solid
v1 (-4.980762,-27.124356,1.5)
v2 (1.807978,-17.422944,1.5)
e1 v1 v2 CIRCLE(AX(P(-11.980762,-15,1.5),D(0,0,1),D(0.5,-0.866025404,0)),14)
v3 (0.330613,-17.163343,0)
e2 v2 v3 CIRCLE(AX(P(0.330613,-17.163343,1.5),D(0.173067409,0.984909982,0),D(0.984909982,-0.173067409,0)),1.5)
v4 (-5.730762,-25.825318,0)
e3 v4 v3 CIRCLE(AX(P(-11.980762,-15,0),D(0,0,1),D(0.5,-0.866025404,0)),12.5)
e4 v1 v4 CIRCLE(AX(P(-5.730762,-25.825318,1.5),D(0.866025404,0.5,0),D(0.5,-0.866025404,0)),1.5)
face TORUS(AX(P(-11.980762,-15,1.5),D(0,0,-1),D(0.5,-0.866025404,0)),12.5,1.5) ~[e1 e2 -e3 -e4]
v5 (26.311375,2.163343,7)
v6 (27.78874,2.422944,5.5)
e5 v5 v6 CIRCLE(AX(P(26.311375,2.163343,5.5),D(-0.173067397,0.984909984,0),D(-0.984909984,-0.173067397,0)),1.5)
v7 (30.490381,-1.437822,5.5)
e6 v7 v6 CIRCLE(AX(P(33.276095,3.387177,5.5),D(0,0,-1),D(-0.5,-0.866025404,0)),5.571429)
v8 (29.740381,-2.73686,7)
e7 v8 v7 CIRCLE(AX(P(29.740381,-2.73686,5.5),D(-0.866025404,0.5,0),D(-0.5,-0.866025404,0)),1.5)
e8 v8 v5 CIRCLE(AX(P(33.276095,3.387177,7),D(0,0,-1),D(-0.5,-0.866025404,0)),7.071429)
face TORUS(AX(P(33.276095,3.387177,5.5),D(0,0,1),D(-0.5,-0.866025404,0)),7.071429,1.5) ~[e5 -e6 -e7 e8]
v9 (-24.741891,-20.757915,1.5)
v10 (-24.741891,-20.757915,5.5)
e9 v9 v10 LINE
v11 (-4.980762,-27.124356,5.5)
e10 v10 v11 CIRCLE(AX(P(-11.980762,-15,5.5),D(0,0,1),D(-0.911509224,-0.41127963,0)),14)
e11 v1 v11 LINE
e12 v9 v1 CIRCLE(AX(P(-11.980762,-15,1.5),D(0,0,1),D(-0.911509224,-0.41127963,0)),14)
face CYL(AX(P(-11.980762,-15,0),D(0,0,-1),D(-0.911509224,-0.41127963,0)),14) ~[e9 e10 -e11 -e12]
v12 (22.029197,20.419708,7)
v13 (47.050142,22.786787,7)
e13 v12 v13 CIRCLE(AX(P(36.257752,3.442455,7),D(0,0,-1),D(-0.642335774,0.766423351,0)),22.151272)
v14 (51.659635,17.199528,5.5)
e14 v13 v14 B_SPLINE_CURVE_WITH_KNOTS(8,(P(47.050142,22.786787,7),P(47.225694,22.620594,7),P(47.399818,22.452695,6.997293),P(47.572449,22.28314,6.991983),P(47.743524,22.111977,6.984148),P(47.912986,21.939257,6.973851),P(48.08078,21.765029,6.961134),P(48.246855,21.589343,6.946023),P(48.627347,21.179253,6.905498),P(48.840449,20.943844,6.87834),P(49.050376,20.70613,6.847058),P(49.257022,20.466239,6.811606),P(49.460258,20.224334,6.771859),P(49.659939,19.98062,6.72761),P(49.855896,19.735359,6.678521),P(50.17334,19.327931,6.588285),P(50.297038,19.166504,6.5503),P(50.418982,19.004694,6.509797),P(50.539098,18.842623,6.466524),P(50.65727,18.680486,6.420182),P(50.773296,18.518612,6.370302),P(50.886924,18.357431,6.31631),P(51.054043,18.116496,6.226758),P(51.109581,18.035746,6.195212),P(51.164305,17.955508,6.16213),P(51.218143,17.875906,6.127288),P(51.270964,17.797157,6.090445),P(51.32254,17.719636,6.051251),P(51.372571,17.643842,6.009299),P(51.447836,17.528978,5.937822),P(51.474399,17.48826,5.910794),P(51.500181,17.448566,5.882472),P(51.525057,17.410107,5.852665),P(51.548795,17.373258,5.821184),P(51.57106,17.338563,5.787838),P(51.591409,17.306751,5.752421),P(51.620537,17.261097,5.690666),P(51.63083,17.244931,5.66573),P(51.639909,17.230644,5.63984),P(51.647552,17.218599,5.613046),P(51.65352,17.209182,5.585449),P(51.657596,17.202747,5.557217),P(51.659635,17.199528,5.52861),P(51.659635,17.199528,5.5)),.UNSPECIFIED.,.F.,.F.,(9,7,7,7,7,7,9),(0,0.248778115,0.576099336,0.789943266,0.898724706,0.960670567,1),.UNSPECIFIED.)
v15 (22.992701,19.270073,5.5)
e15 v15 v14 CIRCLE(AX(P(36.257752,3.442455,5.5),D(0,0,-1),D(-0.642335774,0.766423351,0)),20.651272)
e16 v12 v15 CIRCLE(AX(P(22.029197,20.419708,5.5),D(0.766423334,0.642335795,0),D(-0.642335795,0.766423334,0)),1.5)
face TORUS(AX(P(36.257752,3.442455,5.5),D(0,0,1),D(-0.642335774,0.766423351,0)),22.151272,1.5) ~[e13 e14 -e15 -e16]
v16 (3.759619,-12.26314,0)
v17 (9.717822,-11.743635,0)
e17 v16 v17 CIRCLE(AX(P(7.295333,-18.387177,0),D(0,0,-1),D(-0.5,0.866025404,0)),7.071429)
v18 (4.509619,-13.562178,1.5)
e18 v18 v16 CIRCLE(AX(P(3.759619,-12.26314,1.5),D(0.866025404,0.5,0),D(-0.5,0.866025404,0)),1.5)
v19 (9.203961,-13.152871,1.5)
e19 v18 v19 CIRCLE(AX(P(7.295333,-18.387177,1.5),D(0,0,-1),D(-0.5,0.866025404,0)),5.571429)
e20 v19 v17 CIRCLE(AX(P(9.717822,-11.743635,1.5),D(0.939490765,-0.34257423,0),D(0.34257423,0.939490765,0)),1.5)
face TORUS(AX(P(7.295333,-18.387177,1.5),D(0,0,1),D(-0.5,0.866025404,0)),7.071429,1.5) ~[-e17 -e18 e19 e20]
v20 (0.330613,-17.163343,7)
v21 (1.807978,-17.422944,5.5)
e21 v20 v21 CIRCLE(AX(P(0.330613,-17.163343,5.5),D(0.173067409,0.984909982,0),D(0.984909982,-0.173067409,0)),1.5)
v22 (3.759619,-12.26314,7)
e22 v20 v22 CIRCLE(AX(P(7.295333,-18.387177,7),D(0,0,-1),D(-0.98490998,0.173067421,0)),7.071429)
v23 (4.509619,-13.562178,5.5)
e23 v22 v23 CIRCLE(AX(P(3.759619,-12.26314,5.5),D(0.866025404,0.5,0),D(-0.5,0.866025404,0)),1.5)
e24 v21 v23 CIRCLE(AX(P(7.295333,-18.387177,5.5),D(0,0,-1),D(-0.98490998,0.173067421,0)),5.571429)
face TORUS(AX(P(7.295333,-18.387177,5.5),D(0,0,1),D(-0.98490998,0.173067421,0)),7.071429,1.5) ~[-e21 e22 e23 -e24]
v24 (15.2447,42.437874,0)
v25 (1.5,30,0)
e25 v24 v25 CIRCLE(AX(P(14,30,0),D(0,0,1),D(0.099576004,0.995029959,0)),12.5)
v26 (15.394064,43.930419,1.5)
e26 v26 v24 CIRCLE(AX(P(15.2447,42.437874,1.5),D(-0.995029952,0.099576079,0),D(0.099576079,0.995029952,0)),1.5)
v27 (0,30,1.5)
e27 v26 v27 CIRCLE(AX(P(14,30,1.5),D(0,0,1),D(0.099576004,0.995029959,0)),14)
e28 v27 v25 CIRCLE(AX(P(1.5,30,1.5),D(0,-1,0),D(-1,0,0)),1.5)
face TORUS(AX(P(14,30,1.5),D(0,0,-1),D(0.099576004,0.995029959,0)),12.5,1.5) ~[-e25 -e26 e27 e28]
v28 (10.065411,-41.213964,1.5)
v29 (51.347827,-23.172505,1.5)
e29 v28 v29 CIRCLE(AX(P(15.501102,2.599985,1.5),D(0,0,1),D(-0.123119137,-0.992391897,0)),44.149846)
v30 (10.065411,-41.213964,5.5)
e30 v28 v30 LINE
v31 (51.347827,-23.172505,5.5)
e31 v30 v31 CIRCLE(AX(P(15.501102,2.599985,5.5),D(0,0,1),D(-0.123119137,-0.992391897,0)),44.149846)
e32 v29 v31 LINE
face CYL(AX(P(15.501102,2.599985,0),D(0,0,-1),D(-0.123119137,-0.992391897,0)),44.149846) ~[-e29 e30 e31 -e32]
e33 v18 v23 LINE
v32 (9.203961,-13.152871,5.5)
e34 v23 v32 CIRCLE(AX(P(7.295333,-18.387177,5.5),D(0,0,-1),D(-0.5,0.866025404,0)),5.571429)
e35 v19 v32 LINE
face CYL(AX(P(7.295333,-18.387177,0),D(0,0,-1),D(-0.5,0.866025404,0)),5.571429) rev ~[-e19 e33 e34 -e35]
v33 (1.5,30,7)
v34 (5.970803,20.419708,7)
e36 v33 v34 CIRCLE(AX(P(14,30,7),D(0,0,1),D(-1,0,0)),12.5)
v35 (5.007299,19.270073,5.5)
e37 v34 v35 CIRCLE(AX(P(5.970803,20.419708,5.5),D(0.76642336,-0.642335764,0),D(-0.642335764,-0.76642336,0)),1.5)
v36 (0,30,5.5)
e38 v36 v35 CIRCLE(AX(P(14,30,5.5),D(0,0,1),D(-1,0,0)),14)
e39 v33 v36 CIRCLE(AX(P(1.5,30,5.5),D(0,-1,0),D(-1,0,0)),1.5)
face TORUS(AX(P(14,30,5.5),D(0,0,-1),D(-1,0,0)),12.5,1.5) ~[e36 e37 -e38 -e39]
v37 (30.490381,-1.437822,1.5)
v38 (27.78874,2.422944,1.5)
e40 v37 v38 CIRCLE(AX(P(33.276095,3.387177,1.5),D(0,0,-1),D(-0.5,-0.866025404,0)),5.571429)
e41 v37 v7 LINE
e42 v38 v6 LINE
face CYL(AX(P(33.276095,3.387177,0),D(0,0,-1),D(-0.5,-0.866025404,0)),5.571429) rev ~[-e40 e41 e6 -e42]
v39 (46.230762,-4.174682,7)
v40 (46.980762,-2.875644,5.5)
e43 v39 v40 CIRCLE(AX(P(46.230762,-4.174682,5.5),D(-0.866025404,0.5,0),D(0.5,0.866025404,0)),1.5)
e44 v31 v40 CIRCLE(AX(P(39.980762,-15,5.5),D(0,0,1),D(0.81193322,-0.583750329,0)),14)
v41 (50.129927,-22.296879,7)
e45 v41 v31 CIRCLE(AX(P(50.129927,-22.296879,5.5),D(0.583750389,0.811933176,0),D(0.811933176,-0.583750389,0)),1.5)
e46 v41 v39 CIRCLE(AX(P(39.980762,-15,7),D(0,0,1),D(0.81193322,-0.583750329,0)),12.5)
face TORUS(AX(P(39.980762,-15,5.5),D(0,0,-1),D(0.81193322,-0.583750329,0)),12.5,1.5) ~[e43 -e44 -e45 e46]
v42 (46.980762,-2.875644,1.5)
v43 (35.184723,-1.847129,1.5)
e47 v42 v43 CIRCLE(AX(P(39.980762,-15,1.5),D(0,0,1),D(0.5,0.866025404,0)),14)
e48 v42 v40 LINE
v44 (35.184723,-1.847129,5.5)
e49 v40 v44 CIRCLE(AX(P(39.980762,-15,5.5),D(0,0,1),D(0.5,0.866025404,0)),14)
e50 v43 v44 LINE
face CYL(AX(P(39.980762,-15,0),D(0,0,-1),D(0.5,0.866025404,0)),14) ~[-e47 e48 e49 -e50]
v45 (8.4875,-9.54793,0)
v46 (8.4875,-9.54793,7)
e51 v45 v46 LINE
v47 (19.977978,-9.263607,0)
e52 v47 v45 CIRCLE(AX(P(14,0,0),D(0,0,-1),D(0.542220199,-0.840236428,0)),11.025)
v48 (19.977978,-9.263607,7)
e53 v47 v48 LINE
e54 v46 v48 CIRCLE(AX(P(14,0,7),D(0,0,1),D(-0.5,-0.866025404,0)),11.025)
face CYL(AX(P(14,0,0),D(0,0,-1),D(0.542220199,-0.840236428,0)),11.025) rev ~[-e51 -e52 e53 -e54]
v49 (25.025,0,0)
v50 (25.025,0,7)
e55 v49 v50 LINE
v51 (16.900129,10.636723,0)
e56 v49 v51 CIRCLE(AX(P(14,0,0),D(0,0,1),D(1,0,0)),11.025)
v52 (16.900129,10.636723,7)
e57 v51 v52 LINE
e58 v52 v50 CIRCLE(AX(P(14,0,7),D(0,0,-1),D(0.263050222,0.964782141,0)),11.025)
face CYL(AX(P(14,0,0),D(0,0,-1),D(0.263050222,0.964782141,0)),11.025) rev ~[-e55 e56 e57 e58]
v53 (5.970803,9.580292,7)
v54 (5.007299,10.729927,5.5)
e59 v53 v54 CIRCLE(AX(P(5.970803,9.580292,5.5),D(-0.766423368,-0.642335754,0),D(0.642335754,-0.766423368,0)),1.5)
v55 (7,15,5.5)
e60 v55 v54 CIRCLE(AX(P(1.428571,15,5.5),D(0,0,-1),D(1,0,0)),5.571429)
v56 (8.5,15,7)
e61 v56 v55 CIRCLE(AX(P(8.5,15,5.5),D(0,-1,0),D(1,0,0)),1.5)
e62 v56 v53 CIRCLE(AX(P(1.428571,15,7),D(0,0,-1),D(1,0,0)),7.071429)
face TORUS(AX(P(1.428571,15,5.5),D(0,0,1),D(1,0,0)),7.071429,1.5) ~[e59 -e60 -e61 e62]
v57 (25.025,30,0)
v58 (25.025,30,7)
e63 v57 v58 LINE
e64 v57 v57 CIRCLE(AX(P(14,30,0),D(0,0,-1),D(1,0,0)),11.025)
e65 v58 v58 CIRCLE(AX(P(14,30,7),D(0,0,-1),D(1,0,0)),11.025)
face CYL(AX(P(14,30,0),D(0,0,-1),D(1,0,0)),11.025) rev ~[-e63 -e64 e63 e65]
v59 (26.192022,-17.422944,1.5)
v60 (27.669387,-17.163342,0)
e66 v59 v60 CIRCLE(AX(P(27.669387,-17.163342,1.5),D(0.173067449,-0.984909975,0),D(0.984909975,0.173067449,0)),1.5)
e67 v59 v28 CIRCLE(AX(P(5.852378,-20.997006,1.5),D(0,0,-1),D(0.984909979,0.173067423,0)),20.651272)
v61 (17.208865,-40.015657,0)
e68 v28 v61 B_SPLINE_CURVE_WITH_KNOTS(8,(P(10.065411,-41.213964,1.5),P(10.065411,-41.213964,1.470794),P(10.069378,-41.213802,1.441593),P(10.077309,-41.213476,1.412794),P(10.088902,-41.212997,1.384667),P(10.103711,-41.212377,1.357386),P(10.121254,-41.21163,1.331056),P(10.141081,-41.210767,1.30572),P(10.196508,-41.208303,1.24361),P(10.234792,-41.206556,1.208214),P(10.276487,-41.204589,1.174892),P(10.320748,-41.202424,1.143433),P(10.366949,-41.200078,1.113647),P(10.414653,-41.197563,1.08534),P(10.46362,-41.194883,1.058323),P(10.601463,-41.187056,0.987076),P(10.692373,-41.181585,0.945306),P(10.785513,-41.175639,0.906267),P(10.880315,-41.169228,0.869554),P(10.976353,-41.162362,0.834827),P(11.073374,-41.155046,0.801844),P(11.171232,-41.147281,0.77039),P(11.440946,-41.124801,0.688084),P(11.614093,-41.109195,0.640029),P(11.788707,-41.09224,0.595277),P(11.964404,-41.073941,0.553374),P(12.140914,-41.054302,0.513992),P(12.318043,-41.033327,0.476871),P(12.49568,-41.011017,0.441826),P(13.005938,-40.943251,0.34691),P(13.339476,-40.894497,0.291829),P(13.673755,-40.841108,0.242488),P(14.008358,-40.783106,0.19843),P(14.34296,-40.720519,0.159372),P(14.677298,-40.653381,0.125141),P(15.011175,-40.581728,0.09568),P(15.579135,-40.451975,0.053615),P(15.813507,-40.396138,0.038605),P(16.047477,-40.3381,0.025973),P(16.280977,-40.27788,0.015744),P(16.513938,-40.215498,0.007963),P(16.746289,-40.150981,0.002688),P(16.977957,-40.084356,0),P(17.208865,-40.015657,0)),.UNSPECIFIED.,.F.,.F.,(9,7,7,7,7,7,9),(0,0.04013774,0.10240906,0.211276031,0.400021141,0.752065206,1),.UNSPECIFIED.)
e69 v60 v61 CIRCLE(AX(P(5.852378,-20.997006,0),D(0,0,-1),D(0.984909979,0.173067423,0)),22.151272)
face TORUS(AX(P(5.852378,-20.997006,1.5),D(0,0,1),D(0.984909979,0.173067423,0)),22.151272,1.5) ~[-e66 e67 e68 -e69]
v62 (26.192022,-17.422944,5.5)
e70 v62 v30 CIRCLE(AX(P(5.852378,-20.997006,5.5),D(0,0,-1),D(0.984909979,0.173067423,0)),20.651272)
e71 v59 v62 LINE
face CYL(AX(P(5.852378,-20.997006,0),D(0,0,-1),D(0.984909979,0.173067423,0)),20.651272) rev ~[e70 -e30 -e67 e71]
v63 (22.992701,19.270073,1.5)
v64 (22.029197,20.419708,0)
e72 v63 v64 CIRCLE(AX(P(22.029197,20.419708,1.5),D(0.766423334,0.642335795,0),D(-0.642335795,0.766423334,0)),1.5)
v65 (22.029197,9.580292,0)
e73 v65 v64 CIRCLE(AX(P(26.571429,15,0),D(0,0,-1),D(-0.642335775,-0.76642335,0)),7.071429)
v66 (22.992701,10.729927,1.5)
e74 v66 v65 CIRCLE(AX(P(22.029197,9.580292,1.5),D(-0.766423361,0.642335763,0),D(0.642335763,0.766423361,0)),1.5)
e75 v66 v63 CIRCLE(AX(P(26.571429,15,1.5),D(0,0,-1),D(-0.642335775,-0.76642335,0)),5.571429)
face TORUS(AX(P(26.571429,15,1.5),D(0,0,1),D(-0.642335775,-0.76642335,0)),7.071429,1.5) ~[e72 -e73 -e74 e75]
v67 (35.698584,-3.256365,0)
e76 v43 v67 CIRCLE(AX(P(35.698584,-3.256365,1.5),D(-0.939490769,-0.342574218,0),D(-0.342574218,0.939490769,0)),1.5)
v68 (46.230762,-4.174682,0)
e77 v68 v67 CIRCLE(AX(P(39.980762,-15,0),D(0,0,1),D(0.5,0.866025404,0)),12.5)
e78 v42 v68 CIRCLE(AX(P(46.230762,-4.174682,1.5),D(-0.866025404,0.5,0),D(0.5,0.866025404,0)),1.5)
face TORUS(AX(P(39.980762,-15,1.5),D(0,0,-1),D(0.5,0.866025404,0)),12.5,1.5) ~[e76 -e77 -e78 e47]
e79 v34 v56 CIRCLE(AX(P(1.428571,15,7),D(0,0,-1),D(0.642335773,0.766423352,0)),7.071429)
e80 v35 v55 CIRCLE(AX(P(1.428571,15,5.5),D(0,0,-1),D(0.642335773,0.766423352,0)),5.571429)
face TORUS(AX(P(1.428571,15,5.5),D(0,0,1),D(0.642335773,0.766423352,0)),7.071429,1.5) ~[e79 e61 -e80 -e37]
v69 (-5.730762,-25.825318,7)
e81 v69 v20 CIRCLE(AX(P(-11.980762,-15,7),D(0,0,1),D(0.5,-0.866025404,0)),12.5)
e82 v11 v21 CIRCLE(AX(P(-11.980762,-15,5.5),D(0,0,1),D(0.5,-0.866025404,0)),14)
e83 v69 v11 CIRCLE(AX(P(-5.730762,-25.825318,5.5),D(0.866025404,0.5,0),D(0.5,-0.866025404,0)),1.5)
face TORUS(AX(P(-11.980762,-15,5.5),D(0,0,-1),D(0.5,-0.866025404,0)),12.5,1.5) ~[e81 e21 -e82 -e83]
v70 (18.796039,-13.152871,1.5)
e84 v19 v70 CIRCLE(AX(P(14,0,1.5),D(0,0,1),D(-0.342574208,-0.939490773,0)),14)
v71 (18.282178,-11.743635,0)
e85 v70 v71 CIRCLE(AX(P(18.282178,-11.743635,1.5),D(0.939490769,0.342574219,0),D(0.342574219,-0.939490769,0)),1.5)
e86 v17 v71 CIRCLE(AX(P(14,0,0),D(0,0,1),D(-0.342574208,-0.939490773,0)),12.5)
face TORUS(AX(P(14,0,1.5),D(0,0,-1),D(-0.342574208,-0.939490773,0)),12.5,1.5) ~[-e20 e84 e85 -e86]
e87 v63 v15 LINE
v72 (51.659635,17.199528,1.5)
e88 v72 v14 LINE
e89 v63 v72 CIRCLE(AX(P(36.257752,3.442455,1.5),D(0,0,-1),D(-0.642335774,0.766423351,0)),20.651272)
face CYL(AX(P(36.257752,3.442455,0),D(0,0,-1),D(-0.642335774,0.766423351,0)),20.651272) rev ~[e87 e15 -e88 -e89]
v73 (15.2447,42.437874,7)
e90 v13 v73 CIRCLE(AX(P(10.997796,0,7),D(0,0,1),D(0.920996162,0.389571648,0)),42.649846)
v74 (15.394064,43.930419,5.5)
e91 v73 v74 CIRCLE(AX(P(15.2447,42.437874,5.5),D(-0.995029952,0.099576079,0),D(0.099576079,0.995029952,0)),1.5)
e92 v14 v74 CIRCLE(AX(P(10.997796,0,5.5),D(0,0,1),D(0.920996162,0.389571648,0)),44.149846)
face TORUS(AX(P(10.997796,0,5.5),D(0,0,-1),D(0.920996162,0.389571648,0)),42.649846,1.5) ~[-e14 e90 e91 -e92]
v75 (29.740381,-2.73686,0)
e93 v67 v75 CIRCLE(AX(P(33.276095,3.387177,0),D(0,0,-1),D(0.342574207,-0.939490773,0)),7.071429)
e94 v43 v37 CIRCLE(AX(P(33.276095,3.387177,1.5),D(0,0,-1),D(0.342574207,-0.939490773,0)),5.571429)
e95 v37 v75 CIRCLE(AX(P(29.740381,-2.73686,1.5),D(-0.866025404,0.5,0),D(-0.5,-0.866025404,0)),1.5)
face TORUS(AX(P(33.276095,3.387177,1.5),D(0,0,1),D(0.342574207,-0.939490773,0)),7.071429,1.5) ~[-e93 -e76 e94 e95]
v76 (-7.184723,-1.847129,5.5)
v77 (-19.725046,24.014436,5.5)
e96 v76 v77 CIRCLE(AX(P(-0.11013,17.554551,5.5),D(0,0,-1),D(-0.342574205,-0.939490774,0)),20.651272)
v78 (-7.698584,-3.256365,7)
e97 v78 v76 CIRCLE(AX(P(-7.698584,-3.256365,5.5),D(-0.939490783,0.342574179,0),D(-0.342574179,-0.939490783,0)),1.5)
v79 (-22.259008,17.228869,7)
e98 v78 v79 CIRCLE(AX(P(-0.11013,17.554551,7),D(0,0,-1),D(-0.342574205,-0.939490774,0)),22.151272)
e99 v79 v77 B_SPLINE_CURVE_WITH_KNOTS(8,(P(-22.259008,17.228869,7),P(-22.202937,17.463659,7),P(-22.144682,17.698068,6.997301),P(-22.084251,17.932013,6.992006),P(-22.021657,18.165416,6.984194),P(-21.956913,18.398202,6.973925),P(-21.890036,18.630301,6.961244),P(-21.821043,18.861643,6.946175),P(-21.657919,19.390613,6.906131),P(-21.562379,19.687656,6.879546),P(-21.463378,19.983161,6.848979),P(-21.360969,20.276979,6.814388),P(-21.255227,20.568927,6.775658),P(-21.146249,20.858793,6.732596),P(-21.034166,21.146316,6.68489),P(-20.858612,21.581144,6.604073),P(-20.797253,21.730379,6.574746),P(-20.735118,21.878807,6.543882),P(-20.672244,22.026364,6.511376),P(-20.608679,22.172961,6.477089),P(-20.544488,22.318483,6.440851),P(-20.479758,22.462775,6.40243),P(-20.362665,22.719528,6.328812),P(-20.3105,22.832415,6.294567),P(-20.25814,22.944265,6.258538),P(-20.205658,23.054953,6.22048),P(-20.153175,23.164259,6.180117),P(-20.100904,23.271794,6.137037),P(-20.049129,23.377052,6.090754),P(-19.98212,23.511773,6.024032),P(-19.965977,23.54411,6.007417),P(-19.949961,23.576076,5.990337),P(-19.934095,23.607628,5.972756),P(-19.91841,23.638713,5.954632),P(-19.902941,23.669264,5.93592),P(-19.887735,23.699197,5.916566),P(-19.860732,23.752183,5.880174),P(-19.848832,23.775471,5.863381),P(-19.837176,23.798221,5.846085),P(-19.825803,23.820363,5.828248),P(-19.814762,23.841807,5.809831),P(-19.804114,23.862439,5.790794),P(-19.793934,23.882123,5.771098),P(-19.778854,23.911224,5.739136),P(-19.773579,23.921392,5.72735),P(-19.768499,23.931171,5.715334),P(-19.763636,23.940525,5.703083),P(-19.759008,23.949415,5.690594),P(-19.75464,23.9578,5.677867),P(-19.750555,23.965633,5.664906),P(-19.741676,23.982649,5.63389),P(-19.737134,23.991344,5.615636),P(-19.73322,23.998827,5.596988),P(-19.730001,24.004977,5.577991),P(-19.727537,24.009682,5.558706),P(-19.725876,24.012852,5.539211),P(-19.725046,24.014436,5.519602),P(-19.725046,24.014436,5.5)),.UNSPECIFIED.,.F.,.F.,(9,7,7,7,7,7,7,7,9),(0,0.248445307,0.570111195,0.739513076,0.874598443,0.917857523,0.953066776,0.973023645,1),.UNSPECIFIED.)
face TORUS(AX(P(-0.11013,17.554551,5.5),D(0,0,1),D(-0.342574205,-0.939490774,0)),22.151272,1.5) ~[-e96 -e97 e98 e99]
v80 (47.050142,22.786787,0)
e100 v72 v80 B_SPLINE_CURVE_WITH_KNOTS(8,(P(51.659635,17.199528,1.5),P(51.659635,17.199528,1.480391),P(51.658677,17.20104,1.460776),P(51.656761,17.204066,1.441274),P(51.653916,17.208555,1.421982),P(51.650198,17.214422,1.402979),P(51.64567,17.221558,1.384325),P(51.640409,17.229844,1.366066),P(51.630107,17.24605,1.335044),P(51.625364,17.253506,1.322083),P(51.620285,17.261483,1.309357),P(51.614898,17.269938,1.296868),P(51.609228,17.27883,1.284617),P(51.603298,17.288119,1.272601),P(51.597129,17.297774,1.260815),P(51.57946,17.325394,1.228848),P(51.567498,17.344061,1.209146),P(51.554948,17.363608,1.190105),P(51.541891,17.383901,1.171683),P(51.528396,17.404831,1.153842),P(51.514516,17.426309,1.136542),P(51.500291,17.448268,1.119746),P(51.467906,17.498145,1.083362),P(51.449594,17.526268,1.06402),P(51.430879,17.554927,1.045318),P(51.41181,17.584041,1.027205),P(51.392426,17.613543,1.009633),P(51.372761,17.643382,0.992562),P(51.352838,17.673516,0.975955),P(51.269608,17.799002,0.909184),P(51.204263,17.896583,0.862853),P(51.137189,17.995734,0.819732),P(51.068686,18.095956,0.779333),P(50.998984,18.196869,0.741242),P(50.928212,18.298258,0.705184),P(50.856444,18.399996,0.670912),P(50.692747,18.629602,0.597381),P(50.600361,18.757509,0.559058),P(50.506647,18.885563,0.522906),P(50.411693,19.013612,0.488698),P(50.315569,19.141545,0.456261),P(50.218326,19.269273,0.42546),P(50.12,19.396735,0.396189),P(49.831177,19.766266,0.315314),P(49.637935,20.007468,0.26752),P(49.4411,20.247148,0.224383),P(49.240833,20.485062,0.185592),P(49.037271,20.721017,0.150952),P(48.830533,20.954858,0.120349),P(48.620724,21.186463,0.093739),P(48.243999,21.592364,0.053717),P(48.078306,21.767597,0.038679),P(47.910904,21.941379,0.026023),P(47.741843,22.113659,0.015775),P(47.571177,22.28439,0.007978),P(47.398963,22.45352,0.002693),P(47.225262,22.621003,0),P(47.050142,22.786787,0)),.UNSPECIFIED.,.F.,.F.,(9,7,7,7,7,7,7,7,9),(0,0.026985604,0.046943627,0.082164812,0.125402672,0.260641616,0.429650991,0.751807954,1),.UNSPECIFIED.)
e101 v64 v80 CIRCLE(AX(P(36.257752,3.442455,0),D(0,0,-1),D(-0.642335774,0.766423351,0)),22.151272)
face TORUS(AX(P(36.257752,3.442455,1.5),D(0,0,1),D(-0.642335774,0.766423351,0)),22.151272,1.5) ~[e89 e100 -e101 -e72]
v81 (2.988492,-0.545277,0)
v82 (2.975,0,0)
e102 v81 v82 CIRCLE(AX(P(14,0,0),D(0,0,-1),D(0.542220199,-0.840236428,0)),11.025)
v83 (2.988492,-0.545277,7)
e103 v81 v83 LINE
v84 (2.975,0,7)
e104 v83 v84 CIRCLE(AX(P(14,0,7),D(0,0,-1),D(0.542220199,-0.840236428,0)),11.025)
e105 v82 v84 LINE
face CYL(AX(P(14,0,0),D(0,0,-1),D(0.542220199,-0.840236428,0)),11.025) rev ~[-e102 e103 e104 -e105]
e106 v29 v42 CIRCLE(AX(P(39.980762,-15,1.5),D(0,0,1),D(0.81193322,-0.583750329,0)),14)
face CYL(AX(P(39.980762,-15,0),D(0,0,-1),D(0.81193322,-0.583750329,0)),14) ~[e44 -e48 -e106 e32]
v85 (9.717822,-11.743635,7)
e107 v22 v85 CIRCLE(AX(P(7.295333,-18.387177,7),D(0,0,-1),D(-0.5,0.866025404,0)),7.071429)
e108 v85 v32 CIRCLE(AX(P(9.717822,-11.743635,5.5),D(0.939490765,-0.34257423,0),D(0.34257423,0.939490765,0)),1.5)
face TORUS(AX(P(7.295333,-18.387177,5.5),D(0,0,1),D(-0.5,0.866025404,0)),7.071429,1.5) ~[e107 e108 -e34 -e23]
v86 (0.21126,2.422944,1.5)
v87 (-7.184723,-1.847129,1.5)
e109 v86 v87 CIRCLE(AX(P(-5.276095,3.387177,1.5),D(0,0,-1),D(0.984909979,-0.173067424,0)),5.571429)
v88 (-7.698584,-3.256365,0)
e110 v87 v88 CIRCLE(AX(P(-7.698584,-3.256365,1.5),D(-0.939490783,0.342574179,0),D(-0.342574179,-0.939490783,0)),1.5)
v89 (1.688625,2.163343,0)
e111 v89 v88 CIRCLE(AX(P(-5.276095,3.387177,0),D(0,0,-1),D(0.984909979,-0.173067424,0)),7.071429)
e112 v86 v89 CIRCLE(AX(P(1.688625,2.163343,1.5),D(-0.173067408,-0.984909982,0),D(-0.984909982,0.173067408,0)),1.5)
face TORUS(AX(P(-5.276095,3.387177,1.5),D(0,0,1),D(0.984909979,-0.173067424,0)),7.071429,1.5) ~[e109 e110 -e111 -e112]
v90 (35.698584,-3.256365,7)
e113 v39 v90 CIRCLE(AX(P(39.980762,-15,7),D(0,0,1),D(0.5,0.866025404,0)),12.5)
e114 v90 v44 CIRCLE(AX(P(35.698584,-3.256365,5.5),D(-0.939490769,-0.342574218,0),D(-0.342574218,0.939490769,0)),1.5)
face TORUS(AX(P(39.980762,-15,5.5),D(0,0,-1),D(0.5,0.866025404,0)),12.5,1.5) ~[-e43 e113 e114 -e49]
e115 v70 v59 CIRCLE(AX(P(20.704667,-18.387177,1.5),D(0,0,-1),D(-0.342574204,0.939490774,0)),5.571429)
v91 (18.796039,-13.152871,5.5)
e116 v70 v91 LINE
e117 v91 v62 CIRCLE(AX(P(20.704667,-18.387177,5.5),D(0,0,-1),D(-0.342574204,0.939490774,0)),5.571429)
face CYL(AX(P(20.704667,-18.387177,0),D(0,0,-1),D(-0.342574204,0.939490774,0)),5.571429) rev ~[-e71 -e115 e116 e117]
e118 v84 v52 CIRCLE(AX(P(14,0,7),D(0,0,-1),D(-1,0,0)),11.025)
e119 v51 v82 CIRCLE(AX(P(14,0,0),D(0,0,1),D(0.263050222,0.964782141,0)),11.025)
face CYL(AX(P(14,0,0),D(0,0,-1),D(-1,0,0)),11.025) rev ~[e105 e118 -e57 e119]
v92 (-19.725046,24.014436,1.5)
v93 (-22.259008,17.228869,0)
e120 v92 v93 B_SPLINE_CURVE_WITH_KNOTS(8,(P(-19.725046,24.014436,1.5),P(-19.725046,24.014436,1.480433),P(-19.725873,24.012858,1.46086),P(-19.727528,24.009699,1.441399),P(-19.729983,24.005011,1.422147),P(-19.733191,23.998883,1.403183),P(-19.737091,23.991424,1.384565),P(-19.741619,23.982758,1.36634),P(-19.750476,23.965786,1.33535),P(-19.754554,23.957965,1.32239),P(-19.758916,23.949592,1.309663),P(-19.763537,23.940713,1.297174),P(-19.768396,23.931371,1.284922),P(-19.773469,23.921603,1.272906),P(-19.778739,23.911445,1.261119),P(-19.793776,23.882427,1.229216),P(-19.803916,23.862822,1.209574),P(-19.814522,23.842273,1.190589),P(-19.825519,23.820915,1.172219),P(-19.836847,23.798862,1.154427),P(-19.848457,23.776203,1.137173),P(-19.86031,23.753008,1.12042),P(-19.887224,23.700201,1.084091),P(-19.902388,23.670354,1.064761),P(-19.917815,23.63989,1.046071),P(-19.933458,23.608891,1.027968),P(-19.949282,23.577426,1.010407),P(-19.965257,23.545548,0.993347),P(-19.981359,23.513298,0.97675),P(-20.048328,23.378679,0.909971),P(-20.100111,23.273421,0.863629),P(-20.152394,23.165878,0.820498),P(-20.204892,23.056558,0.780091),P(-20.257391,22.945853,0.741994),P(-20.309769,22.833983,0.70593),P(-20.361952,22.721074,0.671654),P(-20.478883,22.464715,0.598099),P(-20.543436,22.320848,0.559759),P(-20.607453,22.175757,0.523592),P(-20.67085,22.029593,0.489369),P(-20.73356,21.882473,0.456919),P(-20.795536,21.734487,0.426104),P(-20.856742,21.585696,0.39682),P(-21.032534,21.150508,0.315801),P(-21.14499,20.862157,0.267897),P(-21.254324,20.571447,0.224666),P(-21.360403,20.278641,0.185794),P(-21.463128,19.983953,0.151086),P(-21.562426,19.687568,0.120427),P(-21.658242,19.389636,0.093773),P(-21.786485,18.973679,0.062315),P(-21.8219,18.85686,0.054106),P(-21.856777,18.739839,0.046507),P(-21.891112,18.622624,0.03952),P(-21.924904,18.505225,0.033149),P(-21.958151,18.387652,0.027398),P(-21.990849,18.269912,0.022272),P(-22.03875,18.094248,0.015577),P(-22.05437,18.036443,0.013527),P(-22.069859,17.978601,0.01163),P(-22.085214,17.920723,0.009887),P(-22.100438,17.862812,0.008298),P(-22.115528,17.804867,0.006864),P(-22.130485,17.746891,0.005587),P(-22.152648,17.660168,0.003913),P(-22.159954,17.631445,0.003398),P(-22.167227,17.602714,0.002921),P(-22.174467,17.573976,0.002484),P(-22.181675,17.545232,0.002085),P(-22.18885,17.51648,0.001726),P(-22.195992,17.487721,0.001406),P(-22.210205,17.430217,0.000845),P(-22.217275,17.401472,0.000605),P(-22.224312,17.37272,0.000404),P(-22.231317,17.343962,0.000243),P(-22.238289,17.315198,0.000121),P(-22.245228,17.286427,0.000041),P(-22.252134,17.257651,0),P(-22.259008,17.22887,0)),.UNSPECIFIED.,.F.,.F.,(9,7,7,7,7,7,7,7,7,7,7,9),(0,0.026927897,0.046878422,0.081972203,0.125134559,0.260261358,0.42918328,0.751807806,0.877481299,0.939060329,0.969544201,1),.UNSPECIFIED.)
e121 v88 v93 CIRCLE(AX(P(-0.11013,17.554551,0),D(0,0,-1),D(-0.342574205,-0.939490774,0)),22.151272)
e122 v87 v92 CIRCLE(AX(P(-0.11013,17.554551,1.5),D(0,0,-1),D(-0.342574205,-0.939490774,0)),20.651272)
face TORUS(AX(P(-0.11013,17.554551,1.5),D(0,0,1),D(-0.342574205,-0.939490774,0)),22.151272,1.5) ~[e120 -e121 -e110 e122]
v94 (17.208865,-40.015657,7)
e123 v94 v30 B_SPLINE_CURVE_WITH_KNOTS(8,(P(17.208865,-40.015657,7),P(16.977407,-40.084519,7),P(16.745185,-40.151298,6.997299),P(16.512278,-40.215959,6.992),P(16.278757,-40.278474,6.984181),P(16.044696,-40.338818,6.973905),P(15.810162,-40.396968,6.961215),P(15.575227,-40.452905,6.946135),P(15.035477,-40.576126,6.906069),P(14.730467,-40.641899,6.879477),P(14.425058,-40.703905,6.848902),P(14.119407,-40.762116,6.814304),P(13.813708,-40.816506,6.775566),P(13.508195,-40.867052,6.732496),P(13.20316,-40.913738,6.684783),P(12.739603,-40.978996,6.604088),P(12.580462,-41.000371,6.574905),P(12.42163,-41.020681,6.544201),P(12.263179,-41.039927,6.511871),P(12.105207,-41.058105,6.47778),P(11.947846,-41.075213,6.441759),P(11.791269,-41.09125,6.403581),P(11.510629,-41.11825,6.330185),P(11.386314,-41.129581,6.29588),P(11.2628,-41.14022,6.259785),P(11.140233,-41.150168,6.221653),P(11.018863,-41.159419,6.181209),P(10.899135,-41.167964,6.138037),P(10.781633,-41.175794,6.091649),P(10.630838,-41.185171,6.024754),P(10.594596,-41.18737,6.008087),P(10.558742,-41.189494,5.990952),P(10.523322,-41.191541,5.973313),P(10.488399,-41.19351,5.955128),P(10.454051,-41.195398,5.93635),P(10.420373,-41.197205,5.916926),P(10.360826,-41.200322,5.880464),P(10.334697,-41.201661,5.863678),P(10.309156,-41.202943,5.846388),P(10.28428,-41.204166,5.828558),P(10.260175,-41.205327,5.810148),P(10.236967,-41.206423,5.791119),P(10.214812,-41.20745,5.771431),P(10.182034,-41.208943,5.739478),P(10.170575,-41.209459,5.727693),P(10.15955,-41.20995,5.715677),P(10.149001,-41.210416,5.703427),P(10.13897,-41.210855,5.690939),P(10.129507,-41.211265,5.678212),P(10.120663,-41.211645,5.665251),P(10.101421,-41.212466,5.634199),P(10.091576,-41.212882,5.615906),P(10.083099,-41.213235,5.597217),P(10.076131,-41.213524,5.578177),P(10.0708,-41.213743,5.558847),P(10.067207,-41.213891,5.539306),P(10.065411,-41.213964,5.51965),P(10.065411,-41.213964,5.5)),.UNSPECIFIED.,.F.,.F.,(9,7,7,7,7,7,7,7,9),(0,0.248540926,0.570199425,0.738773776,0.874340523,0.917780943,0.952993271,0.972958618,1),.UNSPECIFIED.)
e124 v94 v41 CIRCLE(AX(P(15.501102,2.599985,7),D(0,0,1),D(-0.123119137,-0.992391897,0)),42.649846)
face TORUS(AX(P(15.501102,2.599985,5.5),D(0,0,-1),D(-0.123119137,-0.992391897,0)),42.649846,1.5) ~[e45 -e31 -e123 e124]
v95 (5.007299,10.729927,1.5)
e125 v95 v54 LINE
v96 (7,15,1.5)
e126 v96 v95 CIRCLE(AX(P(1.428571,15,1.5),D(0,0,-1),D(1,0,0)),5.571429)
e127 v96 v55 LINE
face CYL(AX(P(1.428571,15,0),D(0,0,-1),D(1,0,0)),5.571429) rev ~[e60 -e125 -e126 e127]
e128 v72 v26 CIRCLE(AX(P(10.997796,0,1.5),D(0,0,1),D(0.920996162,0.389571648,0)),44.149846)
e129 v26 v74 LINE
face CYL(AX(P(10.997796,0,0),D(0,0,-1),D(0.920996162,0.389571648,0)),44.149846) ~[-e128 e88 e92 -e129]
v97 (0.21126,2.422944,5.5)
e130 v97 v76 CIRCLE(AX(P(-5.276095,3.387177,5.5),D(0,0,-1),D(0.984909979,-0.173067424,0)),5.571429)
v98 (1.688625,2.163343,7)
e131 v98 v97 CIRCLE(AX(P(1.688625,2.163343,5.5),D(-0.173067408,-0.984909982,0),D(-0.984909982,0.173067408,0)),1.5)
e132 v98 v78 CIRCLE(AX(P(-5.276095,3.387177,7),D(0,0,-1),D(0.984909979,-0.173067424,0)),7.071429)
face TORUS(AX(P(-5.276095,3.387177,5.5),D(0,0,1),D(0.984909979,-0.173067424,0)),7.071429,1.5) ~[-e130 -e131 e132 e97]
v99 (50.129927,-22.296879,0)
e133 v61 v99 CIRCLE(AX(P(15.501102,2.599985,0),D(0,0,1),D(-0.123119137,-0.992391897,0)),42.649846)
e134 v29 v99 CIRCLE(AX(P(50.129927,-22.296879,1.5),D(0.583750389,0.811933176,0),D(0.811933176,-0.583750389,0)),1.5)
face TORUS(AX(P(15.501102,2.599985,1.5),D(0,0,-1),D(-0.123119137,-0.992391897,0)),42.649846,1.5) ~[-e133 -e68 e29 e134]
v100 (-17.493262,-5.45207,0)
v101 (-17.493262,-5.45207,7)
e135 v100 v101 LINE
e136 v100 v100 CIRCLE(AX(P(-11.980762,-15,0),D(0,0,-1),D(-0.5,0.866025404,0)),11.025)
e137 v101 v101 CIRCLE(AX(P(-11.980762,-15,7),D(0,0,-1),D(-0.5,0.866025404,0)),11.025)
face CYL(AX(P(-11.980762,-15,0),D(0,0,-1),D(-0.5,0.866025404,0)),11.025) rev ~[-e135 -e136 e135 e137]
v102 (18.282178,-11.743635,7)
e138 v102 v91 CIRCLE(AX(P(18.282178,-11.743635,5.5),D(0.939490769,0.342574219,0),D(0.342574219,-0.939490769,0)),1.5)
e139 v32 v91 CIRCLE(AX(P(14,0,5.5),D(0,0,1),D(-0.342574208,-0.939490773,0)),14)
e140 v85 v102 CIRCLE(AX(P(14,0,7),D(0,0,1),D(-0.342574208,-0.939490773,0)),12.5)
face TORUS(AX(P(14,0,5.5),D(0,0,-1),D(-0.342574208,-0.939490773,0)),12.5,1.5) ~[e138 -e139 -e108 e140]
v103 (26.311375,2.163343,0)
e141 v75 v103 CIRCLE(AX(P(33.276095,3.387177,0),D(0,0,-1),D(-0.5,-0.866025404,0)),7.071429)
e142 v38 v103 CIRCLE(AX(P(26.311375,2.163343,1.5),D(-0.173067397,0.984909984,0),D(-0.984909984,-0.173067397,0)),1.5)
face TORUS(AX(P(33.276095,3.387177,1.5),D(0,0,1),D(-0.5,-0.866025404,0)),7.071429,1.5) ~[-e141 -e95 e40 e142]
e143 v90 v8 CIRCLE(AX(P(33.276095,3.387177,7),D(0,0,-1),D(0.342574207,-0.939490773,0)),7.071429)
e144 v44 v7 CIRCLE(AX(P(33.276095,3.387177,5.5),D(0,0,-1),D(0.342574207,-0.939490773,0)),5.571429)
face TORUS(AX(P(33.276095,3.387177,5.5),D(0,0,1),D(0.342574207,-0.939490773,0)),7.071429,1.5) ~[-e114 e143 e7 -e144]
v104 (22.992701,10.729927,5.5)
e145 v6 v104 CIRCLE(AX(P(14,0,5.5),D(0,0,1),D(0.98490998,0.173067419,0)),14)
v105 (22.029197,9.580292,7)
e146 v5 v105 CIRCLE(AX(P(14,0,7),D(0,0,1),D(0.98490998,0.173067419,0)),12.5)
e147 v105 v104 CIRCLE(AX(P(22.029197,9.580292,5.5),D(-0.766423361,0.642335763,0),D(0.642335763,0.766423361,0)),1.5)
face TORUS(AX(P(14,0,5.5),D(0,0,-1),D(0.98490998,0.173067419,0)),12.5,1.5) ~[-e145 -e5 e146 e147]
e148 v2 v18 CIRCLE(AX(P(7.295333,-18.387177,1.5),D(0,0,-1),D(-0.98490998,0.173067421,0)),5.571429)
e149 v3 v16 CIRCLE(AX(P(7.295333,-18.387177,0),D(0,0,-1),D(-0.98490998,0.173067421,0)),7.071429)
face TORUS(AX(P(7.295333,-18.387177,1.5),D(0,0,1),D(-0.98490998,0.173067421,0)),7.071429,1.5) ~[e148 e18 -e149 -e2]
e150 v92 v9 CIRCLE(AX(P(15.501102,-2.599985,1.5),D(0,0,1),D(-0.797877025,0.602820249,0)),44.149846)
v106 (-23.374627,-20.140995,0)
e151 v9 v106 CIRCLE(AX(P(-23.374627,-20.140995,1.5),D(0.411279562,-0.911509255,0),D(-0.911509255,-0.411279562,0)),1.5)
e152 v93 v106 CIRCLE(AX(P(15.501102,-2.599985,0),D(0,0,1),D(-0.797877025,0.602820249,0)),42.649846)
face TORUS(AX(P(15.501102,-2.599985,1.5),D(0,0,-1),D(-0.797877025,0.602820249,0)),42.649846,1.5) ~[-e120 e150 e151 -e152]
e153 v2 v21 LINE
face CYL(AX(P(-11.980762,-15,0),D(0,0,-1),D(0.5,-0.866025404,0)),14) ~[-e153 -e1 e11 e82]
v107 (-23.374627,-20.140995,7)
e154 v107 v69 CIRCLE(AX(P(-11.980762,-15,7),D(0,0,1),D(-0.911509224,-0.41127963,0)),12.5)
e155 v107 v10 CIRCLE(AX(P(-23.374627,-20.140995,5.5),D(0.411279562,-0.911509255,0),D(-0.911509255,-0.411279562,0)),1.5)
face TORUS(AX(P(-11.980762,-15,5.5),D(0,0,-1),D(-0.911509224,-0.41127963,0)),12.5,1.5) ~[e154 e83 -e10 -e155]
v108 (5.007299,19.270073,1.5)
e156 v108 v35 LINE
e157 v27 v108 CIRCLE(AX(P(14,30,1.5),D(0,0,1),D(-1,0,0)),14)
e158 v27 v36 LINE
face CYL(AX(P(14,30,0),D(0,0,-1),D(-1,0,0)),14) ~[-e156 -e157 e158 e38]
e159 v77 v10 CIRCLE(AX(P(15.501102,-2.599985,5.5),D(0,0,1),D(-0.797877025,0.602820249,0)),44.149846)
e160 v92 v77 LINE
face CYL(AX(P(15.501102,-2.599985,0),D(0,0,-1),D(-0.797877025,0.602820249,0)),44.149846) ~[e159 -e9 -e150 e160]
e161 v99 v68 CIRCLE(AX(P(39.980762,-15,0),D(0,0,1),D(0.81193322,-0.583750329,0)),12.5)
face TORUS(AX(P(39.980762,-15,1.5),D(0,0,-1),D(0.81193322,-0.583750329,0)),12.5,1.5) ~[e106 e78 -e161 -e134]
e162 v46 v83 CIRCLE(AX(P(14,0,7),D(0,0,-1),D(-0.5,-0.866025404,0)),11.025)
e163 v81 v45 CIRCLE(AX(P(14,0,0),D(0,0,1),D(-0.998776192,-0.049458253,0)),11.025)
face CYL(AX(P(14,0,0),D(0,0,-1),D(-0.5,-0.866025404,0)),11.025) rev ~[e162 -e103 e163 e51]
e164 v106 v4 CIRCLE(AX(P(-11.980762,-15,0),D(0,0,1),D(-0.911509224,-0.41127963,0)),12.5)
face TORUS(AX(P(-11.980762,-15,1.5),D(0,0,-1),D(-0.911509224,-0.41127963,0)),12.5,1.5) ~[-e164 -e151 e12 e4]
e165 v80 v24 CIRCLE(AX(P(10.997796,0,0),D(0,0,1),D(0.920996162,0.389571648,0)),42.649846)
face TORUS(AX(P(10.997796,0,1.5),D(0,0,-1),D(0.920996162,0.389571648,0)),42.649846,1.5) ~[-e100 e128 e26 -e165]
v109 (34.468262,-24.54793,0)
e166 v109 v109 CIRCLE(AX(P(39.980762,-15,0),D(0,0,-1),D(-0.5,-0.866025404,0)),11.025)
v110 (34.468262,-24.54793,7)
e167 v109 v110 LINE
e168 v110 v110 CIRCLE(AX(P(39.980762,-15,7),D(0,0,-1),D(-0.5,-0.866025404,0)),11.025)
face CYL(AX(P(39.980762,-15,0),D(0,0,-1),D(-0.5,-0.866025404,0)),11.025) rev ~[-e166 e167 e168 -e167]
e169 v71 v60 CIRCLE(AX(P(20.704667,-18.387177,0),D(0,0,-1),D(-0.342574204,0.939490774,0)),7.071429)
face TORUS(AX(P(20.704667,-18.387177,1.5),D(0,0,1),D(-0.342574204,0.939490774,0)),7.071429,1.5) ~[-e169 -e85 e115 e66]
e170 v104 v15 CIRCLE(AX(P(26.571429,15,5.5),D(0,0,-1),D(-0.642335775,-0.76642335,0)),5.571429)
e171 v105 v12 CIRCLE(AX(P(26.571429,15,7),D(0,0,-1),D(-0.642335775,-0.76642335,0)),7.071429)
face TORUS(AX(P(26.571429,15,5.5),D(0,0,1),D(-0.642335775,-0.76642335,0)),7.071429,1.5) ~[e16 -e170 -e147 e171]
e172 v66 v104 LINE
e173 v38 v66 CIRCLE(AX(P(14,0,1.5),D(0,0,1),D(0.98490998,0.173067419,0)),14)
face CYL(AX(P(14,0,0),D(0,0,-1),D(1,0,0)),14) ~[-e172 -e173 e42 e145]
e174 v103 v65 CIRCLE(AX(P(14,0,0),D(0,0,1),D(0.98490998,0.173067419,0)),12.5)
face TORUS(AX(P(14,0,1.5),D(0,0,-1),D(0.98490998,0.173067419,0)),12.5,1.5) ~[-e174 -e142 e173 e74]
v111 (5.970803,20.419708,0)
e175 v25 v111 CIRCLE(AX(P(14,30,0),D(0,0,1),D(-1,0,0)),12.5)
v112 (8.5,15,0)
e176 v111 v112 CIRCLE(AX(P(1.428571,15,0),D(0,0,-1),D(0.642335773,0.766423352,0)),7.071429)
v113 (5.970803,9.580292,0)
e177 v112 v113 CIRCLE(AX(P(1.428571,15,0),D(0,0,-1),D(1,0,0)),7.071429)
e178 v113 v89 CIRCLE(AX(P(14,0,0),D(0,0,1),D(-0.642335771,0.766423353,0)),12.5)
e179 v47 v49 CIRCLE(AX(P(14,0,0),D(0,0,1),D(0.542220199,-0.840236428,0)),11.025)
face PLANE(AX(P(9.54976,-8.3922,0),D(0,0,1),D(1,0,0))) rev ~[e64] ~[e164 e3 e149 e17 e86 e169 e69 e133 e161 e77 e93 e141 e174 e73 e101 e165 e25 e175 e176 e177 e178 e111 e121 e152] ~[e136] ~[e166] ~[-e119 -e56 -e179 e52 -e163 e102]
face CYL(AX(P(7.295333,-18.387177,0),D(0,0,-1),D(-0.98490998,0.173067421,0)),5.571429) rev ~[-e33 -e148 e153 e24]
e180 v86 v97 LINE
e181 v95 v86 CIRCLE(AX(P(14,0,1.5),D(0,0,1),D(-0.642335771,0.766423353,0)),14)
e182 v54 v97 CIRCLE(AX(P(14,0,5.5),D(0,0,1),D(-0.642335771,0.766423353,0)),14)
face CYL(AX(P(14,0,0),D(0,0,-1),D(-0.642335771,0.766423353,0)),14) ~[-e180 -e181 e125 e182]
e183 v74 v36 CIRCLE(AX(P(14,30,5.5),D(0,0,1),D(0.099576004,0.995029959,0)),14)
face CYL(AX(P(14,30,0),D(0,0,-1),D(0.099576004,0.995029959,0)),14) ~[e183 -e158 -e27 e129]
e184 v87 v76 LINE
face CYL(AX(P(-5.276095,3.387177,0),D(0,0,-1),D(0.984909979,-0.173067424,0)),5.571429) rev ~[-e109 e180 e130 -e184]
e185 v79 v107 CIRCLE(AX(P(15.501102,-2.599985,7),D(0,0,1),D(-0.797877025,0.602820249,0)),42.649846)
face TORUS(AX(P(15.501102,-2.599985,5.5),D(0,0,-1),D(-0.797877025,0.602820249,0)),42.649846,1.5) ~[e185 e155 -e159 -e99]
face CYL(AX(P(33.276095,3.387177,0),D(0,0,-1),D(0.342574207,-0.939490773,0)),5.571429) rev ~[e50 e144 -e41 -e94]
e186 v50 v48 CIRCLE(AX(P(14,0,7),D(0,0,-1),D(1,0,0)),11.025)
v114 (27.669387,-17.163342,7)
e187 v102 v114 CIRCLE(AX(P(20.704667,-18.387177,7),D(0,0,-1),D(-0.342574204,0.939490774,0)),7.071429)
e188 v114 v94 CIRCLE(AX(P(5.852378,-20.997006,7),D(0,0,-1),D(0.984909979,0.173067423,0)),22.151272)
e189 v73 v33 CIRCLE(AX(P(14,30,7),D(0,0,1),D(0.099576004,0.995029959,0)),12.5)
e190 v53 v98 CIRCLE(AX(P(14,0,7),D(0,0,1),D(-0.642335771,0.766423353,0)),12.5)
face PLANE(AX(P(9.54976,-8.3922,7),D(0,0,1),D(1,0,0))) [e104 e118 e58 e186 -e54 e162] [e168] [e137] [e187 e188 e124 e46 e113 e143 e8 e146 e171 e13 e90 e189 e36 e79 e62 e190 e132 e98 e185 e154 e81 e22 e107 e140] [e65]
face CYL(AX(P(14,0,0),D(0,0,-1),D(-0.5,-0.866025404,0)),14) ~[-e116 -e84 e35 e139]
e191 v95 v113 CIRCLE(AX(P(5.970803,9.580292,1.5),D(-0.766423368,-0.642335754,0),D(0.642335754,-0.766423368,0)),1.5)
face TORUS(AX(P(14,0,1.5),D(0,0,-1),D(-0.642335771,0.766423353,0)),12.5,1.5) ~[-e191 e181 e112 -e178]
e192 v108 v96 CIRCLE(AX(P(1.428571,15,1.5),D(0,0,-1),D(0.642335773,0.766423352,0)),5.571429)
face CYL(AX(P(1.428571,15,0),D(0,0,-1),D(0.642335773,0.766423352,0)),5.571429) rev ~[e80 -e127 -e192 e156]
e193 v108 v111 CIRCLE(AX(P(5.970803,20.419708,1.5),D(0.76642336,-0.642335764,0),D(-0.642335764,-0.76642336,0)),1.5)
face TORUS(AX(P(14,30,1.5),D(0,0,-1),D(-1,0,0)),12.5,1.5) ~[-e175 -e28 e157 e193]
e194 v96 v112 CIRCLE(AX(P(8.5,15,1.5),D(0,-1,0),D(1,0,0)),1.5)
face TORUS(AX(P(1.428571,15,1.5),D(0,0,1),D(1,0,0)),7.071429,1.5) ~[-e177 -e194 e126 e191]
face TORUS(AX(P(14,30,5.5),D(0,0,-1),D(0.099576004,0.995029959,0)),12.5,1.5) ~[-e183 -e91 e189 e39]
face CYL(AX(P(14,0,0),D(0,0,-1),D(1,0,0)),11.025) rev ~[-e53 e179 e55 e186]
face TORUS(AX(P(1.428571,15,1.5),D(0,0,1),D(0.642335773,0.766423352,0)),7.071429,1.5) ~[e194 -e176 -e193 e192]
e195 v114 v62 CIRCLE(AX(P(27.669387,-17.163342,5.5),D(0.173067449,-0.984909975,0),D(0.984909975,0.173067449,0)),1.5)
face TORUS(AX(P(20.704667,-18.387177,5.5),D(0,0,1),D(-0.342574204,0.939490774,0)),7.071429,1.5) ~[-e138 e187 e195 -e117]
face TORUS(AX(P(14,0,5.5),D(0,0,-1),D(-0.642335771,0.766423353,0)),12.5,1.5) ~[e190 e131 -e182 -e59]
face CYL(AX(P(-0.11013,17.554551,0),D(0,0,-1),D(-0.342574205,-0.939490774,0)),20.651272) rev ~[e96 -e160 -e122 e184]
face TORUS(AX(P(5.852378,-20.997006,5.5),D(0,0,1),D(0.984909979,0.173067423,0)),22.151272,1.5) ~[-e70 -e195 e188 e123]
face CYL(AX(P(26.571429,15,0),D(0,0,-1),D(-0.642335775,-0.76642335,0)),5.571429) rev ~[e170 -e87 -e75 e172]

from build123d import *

# Parameters (mm, degrees)
F1_DEPTH = 7
F2_COUNT = 3
F3_R     = 1.5


# Not quite as in the source:
# - a feature names something its author has since deleted; it is built from what else it names


with BuildPart() as f1:
    # F0 (on Top) → F1 (new body)
    with BuildSketch(Plane.XY):
        with BuildLine():
            ThreePointArc((21.9951433725, -11.4925054907), (20.9459498097, -10.4148089852), (19.9779776986, -9.2636066213))
            ThreePointArc((19.9779776986, -9.2636066213), (8.7253710617, -9.681369457), (2.975, 0))
            Line((2.975, 0), (0, 0))
            ThreePointArc((0, 0), (7.5166369535, -12.4083038167), (21.9951433725, -11.4925054907))
        make_face()
        with BuildLine():
            ThreePointArc((2.975, 0), (7.3075898939, 8.7614081044), (16.9001287025, 10.6367231095))
            ThreePointArc((16.9001287025, 10.6367231095), (17.4750953036, 12.0265613368), (18.1496945041, 13.3708651748))
            ThreePointArc((18.1496945041, 13.3708651748), (11.2418636412, 13.7256214368), (5.0072992002, 10.7299269487))
            ThreePointArc((5.0072992002, 10.7299269487), (1.3134360208, 5.9203964733), (0, 0))
            Line((0, 0), (2.975, 0))
        make_face()
        with BuildLine():
            Line((25.025, 30), (28, 30))
            ThreePointArc((28, 30), (24.3806766846, 39.3936974387), (15.3940640614, 43.9304194263))
            ThreePointArc((15.3940640614, 43.9304194263), (4.6063025613, 40.3806766846), (0, 30))
            Line((0, 30), (2.975, 30))
            ThreePointArc((2.975, 30), (14, 41.025), (25.025, 30))
        make_face()
        with BuildLine():
            ThreePointArc((5.0072993058, 19.2700729627), (13.9999999193, 16), (22.9927005704, 19.270072859))
            ThreePointArc((22.9927005704, 19.270072859), (26.6865639159, 24.079603391), (28, 30))
            Line((28, 30), (25.025, 30))
            ThreePointArc((25.025, 30), (14, 18.975), (2.975, 30))
            Line((2.975, 30), (0, 30))
            ThreePointArc((0, 30), (1.3134360499, 24.0796034642), (5.0072993058, 19.2700729627))
        make_face()
        with BuildLine():
            ThreePointArc((16.9001287025, 10.6367231095), (22.7614081044, 6.6924101061), (25.025, 0))
            Line((25.025, 0), (28, 0))
            ThreePointArc((28, 0), (26.6865639463, 5.9203965438), (22.9927006805, 10.7299270487))
            ThreePointArc((22.9927006805, 10.7299270487), (20.702557448, 12.2912864931), (18.1496945041, 13.3708651748))
            ThreePointArc((18.1496945041, 13.3708651748), (17.4750953036, 12.0265613368), (16.9001287025, 10.6367231095))
        make_face()
        with BuildLine():
            ThreePointArc((18.1496945041, 13.3708651748), (20.702557448, 12.2912864931), (22.9927006805, 10.7299270487))
            ThreePointArc((22.9927006805, 10.7299270487), (21, 14.9999999282), (22.9927005704, 19.270072859))
            ThreePointArc((22.9927005704, 19.270072859), (20.2962936097, 16.5461537969), (18.1496945041, 13.3708651748))
        make_face()
        with BuildLine():
            Line((28, 0), (25.025, 0))
            ThreePointArc((25.025, 0), (23.681369457, -5.2746289383), (19.9779776986, -9.2636066213))
            ThreePointArc((19.9779776986, -9.2636066213), (20.9459498097, -10.4148089852), (21.9951433725, -11.4925054907))
            ThreePointArc((21.9951433725, -11.4925054907), (26.4083038167, -6.4833630465), (28, 0))
        make_face()
        with BuildLine():
            ThreePointArc((5.0072992002, 10.7299269487), (11.2418636412, 13.7256214368), (18.1496945041, 13.3708651748))
            ThreePointArc((18.1496945041, 13.3708651748), (20.2962936097, 16.5461537969), (22.9927005704, 19.270072859))
            ThreePointArc((22.9927005704, 19.270072859), (13.9999999193, 16), (5.0072993058, 19.2700729627))
            ThreePointArc((5.0072993058, 19.2700729627), (6.4773060756, 17.3560761428), (7, 15))
            ThreePointArc((7, 15), (6.4773060464, 12.6439237947), (5.0072992002, 10.7299269487))
        make_face()
        with BuildLine():
            ThreePointArc((28, 30), (26.6865639159, 24.079603391), (22.9927005704, 19.270072859))
            ThreePointArc((22.9927005704, 19.270072859), (37.7454683817, 24.0400706311), (51.6596345021, 17.1995284003))
            ThreePointArc((51.6596345021, 17.1995284003), (37.1930889334, 35.5389297837), (15.3940640614, 43.9304194263))
            ThreePointArc((15.3940640614, 43.9304194263), (24.3806766846, 39.3936974387), (28, 30))
        make_face()
    extrude(amount=F1_DEPTH)

    # F2: F1 ×3 about axis
    f2_axis = Axis((14, 0, 0), (0, 0, -1))


with BuildPart() as f1_1:
    add(f1.part)
    for i in range(1, F2_COUNT):
        add(f1.part.rotate(f2_axis, i * 360 / F2_COUNT))

    # F3
    f3_edges = [f1_1.edges().sort_by_distance(p)[0] for p in [
        (33.181072, -37.855269, 7),
        (22.946578, -32.584214, 7),
        (33.181072, -37.855269, 0),
        (37.193089, 35.53893, 7),
        (37.193089, 35.53893, 0),
        (22.946578, -32.584214, 0),
        (-28.37416, 2.316339, 0),
        (-10.235911, -28.890842, 0),
    ]]
    fillet(f3_edges, radius=F3_R)


solid = f1_1.part
